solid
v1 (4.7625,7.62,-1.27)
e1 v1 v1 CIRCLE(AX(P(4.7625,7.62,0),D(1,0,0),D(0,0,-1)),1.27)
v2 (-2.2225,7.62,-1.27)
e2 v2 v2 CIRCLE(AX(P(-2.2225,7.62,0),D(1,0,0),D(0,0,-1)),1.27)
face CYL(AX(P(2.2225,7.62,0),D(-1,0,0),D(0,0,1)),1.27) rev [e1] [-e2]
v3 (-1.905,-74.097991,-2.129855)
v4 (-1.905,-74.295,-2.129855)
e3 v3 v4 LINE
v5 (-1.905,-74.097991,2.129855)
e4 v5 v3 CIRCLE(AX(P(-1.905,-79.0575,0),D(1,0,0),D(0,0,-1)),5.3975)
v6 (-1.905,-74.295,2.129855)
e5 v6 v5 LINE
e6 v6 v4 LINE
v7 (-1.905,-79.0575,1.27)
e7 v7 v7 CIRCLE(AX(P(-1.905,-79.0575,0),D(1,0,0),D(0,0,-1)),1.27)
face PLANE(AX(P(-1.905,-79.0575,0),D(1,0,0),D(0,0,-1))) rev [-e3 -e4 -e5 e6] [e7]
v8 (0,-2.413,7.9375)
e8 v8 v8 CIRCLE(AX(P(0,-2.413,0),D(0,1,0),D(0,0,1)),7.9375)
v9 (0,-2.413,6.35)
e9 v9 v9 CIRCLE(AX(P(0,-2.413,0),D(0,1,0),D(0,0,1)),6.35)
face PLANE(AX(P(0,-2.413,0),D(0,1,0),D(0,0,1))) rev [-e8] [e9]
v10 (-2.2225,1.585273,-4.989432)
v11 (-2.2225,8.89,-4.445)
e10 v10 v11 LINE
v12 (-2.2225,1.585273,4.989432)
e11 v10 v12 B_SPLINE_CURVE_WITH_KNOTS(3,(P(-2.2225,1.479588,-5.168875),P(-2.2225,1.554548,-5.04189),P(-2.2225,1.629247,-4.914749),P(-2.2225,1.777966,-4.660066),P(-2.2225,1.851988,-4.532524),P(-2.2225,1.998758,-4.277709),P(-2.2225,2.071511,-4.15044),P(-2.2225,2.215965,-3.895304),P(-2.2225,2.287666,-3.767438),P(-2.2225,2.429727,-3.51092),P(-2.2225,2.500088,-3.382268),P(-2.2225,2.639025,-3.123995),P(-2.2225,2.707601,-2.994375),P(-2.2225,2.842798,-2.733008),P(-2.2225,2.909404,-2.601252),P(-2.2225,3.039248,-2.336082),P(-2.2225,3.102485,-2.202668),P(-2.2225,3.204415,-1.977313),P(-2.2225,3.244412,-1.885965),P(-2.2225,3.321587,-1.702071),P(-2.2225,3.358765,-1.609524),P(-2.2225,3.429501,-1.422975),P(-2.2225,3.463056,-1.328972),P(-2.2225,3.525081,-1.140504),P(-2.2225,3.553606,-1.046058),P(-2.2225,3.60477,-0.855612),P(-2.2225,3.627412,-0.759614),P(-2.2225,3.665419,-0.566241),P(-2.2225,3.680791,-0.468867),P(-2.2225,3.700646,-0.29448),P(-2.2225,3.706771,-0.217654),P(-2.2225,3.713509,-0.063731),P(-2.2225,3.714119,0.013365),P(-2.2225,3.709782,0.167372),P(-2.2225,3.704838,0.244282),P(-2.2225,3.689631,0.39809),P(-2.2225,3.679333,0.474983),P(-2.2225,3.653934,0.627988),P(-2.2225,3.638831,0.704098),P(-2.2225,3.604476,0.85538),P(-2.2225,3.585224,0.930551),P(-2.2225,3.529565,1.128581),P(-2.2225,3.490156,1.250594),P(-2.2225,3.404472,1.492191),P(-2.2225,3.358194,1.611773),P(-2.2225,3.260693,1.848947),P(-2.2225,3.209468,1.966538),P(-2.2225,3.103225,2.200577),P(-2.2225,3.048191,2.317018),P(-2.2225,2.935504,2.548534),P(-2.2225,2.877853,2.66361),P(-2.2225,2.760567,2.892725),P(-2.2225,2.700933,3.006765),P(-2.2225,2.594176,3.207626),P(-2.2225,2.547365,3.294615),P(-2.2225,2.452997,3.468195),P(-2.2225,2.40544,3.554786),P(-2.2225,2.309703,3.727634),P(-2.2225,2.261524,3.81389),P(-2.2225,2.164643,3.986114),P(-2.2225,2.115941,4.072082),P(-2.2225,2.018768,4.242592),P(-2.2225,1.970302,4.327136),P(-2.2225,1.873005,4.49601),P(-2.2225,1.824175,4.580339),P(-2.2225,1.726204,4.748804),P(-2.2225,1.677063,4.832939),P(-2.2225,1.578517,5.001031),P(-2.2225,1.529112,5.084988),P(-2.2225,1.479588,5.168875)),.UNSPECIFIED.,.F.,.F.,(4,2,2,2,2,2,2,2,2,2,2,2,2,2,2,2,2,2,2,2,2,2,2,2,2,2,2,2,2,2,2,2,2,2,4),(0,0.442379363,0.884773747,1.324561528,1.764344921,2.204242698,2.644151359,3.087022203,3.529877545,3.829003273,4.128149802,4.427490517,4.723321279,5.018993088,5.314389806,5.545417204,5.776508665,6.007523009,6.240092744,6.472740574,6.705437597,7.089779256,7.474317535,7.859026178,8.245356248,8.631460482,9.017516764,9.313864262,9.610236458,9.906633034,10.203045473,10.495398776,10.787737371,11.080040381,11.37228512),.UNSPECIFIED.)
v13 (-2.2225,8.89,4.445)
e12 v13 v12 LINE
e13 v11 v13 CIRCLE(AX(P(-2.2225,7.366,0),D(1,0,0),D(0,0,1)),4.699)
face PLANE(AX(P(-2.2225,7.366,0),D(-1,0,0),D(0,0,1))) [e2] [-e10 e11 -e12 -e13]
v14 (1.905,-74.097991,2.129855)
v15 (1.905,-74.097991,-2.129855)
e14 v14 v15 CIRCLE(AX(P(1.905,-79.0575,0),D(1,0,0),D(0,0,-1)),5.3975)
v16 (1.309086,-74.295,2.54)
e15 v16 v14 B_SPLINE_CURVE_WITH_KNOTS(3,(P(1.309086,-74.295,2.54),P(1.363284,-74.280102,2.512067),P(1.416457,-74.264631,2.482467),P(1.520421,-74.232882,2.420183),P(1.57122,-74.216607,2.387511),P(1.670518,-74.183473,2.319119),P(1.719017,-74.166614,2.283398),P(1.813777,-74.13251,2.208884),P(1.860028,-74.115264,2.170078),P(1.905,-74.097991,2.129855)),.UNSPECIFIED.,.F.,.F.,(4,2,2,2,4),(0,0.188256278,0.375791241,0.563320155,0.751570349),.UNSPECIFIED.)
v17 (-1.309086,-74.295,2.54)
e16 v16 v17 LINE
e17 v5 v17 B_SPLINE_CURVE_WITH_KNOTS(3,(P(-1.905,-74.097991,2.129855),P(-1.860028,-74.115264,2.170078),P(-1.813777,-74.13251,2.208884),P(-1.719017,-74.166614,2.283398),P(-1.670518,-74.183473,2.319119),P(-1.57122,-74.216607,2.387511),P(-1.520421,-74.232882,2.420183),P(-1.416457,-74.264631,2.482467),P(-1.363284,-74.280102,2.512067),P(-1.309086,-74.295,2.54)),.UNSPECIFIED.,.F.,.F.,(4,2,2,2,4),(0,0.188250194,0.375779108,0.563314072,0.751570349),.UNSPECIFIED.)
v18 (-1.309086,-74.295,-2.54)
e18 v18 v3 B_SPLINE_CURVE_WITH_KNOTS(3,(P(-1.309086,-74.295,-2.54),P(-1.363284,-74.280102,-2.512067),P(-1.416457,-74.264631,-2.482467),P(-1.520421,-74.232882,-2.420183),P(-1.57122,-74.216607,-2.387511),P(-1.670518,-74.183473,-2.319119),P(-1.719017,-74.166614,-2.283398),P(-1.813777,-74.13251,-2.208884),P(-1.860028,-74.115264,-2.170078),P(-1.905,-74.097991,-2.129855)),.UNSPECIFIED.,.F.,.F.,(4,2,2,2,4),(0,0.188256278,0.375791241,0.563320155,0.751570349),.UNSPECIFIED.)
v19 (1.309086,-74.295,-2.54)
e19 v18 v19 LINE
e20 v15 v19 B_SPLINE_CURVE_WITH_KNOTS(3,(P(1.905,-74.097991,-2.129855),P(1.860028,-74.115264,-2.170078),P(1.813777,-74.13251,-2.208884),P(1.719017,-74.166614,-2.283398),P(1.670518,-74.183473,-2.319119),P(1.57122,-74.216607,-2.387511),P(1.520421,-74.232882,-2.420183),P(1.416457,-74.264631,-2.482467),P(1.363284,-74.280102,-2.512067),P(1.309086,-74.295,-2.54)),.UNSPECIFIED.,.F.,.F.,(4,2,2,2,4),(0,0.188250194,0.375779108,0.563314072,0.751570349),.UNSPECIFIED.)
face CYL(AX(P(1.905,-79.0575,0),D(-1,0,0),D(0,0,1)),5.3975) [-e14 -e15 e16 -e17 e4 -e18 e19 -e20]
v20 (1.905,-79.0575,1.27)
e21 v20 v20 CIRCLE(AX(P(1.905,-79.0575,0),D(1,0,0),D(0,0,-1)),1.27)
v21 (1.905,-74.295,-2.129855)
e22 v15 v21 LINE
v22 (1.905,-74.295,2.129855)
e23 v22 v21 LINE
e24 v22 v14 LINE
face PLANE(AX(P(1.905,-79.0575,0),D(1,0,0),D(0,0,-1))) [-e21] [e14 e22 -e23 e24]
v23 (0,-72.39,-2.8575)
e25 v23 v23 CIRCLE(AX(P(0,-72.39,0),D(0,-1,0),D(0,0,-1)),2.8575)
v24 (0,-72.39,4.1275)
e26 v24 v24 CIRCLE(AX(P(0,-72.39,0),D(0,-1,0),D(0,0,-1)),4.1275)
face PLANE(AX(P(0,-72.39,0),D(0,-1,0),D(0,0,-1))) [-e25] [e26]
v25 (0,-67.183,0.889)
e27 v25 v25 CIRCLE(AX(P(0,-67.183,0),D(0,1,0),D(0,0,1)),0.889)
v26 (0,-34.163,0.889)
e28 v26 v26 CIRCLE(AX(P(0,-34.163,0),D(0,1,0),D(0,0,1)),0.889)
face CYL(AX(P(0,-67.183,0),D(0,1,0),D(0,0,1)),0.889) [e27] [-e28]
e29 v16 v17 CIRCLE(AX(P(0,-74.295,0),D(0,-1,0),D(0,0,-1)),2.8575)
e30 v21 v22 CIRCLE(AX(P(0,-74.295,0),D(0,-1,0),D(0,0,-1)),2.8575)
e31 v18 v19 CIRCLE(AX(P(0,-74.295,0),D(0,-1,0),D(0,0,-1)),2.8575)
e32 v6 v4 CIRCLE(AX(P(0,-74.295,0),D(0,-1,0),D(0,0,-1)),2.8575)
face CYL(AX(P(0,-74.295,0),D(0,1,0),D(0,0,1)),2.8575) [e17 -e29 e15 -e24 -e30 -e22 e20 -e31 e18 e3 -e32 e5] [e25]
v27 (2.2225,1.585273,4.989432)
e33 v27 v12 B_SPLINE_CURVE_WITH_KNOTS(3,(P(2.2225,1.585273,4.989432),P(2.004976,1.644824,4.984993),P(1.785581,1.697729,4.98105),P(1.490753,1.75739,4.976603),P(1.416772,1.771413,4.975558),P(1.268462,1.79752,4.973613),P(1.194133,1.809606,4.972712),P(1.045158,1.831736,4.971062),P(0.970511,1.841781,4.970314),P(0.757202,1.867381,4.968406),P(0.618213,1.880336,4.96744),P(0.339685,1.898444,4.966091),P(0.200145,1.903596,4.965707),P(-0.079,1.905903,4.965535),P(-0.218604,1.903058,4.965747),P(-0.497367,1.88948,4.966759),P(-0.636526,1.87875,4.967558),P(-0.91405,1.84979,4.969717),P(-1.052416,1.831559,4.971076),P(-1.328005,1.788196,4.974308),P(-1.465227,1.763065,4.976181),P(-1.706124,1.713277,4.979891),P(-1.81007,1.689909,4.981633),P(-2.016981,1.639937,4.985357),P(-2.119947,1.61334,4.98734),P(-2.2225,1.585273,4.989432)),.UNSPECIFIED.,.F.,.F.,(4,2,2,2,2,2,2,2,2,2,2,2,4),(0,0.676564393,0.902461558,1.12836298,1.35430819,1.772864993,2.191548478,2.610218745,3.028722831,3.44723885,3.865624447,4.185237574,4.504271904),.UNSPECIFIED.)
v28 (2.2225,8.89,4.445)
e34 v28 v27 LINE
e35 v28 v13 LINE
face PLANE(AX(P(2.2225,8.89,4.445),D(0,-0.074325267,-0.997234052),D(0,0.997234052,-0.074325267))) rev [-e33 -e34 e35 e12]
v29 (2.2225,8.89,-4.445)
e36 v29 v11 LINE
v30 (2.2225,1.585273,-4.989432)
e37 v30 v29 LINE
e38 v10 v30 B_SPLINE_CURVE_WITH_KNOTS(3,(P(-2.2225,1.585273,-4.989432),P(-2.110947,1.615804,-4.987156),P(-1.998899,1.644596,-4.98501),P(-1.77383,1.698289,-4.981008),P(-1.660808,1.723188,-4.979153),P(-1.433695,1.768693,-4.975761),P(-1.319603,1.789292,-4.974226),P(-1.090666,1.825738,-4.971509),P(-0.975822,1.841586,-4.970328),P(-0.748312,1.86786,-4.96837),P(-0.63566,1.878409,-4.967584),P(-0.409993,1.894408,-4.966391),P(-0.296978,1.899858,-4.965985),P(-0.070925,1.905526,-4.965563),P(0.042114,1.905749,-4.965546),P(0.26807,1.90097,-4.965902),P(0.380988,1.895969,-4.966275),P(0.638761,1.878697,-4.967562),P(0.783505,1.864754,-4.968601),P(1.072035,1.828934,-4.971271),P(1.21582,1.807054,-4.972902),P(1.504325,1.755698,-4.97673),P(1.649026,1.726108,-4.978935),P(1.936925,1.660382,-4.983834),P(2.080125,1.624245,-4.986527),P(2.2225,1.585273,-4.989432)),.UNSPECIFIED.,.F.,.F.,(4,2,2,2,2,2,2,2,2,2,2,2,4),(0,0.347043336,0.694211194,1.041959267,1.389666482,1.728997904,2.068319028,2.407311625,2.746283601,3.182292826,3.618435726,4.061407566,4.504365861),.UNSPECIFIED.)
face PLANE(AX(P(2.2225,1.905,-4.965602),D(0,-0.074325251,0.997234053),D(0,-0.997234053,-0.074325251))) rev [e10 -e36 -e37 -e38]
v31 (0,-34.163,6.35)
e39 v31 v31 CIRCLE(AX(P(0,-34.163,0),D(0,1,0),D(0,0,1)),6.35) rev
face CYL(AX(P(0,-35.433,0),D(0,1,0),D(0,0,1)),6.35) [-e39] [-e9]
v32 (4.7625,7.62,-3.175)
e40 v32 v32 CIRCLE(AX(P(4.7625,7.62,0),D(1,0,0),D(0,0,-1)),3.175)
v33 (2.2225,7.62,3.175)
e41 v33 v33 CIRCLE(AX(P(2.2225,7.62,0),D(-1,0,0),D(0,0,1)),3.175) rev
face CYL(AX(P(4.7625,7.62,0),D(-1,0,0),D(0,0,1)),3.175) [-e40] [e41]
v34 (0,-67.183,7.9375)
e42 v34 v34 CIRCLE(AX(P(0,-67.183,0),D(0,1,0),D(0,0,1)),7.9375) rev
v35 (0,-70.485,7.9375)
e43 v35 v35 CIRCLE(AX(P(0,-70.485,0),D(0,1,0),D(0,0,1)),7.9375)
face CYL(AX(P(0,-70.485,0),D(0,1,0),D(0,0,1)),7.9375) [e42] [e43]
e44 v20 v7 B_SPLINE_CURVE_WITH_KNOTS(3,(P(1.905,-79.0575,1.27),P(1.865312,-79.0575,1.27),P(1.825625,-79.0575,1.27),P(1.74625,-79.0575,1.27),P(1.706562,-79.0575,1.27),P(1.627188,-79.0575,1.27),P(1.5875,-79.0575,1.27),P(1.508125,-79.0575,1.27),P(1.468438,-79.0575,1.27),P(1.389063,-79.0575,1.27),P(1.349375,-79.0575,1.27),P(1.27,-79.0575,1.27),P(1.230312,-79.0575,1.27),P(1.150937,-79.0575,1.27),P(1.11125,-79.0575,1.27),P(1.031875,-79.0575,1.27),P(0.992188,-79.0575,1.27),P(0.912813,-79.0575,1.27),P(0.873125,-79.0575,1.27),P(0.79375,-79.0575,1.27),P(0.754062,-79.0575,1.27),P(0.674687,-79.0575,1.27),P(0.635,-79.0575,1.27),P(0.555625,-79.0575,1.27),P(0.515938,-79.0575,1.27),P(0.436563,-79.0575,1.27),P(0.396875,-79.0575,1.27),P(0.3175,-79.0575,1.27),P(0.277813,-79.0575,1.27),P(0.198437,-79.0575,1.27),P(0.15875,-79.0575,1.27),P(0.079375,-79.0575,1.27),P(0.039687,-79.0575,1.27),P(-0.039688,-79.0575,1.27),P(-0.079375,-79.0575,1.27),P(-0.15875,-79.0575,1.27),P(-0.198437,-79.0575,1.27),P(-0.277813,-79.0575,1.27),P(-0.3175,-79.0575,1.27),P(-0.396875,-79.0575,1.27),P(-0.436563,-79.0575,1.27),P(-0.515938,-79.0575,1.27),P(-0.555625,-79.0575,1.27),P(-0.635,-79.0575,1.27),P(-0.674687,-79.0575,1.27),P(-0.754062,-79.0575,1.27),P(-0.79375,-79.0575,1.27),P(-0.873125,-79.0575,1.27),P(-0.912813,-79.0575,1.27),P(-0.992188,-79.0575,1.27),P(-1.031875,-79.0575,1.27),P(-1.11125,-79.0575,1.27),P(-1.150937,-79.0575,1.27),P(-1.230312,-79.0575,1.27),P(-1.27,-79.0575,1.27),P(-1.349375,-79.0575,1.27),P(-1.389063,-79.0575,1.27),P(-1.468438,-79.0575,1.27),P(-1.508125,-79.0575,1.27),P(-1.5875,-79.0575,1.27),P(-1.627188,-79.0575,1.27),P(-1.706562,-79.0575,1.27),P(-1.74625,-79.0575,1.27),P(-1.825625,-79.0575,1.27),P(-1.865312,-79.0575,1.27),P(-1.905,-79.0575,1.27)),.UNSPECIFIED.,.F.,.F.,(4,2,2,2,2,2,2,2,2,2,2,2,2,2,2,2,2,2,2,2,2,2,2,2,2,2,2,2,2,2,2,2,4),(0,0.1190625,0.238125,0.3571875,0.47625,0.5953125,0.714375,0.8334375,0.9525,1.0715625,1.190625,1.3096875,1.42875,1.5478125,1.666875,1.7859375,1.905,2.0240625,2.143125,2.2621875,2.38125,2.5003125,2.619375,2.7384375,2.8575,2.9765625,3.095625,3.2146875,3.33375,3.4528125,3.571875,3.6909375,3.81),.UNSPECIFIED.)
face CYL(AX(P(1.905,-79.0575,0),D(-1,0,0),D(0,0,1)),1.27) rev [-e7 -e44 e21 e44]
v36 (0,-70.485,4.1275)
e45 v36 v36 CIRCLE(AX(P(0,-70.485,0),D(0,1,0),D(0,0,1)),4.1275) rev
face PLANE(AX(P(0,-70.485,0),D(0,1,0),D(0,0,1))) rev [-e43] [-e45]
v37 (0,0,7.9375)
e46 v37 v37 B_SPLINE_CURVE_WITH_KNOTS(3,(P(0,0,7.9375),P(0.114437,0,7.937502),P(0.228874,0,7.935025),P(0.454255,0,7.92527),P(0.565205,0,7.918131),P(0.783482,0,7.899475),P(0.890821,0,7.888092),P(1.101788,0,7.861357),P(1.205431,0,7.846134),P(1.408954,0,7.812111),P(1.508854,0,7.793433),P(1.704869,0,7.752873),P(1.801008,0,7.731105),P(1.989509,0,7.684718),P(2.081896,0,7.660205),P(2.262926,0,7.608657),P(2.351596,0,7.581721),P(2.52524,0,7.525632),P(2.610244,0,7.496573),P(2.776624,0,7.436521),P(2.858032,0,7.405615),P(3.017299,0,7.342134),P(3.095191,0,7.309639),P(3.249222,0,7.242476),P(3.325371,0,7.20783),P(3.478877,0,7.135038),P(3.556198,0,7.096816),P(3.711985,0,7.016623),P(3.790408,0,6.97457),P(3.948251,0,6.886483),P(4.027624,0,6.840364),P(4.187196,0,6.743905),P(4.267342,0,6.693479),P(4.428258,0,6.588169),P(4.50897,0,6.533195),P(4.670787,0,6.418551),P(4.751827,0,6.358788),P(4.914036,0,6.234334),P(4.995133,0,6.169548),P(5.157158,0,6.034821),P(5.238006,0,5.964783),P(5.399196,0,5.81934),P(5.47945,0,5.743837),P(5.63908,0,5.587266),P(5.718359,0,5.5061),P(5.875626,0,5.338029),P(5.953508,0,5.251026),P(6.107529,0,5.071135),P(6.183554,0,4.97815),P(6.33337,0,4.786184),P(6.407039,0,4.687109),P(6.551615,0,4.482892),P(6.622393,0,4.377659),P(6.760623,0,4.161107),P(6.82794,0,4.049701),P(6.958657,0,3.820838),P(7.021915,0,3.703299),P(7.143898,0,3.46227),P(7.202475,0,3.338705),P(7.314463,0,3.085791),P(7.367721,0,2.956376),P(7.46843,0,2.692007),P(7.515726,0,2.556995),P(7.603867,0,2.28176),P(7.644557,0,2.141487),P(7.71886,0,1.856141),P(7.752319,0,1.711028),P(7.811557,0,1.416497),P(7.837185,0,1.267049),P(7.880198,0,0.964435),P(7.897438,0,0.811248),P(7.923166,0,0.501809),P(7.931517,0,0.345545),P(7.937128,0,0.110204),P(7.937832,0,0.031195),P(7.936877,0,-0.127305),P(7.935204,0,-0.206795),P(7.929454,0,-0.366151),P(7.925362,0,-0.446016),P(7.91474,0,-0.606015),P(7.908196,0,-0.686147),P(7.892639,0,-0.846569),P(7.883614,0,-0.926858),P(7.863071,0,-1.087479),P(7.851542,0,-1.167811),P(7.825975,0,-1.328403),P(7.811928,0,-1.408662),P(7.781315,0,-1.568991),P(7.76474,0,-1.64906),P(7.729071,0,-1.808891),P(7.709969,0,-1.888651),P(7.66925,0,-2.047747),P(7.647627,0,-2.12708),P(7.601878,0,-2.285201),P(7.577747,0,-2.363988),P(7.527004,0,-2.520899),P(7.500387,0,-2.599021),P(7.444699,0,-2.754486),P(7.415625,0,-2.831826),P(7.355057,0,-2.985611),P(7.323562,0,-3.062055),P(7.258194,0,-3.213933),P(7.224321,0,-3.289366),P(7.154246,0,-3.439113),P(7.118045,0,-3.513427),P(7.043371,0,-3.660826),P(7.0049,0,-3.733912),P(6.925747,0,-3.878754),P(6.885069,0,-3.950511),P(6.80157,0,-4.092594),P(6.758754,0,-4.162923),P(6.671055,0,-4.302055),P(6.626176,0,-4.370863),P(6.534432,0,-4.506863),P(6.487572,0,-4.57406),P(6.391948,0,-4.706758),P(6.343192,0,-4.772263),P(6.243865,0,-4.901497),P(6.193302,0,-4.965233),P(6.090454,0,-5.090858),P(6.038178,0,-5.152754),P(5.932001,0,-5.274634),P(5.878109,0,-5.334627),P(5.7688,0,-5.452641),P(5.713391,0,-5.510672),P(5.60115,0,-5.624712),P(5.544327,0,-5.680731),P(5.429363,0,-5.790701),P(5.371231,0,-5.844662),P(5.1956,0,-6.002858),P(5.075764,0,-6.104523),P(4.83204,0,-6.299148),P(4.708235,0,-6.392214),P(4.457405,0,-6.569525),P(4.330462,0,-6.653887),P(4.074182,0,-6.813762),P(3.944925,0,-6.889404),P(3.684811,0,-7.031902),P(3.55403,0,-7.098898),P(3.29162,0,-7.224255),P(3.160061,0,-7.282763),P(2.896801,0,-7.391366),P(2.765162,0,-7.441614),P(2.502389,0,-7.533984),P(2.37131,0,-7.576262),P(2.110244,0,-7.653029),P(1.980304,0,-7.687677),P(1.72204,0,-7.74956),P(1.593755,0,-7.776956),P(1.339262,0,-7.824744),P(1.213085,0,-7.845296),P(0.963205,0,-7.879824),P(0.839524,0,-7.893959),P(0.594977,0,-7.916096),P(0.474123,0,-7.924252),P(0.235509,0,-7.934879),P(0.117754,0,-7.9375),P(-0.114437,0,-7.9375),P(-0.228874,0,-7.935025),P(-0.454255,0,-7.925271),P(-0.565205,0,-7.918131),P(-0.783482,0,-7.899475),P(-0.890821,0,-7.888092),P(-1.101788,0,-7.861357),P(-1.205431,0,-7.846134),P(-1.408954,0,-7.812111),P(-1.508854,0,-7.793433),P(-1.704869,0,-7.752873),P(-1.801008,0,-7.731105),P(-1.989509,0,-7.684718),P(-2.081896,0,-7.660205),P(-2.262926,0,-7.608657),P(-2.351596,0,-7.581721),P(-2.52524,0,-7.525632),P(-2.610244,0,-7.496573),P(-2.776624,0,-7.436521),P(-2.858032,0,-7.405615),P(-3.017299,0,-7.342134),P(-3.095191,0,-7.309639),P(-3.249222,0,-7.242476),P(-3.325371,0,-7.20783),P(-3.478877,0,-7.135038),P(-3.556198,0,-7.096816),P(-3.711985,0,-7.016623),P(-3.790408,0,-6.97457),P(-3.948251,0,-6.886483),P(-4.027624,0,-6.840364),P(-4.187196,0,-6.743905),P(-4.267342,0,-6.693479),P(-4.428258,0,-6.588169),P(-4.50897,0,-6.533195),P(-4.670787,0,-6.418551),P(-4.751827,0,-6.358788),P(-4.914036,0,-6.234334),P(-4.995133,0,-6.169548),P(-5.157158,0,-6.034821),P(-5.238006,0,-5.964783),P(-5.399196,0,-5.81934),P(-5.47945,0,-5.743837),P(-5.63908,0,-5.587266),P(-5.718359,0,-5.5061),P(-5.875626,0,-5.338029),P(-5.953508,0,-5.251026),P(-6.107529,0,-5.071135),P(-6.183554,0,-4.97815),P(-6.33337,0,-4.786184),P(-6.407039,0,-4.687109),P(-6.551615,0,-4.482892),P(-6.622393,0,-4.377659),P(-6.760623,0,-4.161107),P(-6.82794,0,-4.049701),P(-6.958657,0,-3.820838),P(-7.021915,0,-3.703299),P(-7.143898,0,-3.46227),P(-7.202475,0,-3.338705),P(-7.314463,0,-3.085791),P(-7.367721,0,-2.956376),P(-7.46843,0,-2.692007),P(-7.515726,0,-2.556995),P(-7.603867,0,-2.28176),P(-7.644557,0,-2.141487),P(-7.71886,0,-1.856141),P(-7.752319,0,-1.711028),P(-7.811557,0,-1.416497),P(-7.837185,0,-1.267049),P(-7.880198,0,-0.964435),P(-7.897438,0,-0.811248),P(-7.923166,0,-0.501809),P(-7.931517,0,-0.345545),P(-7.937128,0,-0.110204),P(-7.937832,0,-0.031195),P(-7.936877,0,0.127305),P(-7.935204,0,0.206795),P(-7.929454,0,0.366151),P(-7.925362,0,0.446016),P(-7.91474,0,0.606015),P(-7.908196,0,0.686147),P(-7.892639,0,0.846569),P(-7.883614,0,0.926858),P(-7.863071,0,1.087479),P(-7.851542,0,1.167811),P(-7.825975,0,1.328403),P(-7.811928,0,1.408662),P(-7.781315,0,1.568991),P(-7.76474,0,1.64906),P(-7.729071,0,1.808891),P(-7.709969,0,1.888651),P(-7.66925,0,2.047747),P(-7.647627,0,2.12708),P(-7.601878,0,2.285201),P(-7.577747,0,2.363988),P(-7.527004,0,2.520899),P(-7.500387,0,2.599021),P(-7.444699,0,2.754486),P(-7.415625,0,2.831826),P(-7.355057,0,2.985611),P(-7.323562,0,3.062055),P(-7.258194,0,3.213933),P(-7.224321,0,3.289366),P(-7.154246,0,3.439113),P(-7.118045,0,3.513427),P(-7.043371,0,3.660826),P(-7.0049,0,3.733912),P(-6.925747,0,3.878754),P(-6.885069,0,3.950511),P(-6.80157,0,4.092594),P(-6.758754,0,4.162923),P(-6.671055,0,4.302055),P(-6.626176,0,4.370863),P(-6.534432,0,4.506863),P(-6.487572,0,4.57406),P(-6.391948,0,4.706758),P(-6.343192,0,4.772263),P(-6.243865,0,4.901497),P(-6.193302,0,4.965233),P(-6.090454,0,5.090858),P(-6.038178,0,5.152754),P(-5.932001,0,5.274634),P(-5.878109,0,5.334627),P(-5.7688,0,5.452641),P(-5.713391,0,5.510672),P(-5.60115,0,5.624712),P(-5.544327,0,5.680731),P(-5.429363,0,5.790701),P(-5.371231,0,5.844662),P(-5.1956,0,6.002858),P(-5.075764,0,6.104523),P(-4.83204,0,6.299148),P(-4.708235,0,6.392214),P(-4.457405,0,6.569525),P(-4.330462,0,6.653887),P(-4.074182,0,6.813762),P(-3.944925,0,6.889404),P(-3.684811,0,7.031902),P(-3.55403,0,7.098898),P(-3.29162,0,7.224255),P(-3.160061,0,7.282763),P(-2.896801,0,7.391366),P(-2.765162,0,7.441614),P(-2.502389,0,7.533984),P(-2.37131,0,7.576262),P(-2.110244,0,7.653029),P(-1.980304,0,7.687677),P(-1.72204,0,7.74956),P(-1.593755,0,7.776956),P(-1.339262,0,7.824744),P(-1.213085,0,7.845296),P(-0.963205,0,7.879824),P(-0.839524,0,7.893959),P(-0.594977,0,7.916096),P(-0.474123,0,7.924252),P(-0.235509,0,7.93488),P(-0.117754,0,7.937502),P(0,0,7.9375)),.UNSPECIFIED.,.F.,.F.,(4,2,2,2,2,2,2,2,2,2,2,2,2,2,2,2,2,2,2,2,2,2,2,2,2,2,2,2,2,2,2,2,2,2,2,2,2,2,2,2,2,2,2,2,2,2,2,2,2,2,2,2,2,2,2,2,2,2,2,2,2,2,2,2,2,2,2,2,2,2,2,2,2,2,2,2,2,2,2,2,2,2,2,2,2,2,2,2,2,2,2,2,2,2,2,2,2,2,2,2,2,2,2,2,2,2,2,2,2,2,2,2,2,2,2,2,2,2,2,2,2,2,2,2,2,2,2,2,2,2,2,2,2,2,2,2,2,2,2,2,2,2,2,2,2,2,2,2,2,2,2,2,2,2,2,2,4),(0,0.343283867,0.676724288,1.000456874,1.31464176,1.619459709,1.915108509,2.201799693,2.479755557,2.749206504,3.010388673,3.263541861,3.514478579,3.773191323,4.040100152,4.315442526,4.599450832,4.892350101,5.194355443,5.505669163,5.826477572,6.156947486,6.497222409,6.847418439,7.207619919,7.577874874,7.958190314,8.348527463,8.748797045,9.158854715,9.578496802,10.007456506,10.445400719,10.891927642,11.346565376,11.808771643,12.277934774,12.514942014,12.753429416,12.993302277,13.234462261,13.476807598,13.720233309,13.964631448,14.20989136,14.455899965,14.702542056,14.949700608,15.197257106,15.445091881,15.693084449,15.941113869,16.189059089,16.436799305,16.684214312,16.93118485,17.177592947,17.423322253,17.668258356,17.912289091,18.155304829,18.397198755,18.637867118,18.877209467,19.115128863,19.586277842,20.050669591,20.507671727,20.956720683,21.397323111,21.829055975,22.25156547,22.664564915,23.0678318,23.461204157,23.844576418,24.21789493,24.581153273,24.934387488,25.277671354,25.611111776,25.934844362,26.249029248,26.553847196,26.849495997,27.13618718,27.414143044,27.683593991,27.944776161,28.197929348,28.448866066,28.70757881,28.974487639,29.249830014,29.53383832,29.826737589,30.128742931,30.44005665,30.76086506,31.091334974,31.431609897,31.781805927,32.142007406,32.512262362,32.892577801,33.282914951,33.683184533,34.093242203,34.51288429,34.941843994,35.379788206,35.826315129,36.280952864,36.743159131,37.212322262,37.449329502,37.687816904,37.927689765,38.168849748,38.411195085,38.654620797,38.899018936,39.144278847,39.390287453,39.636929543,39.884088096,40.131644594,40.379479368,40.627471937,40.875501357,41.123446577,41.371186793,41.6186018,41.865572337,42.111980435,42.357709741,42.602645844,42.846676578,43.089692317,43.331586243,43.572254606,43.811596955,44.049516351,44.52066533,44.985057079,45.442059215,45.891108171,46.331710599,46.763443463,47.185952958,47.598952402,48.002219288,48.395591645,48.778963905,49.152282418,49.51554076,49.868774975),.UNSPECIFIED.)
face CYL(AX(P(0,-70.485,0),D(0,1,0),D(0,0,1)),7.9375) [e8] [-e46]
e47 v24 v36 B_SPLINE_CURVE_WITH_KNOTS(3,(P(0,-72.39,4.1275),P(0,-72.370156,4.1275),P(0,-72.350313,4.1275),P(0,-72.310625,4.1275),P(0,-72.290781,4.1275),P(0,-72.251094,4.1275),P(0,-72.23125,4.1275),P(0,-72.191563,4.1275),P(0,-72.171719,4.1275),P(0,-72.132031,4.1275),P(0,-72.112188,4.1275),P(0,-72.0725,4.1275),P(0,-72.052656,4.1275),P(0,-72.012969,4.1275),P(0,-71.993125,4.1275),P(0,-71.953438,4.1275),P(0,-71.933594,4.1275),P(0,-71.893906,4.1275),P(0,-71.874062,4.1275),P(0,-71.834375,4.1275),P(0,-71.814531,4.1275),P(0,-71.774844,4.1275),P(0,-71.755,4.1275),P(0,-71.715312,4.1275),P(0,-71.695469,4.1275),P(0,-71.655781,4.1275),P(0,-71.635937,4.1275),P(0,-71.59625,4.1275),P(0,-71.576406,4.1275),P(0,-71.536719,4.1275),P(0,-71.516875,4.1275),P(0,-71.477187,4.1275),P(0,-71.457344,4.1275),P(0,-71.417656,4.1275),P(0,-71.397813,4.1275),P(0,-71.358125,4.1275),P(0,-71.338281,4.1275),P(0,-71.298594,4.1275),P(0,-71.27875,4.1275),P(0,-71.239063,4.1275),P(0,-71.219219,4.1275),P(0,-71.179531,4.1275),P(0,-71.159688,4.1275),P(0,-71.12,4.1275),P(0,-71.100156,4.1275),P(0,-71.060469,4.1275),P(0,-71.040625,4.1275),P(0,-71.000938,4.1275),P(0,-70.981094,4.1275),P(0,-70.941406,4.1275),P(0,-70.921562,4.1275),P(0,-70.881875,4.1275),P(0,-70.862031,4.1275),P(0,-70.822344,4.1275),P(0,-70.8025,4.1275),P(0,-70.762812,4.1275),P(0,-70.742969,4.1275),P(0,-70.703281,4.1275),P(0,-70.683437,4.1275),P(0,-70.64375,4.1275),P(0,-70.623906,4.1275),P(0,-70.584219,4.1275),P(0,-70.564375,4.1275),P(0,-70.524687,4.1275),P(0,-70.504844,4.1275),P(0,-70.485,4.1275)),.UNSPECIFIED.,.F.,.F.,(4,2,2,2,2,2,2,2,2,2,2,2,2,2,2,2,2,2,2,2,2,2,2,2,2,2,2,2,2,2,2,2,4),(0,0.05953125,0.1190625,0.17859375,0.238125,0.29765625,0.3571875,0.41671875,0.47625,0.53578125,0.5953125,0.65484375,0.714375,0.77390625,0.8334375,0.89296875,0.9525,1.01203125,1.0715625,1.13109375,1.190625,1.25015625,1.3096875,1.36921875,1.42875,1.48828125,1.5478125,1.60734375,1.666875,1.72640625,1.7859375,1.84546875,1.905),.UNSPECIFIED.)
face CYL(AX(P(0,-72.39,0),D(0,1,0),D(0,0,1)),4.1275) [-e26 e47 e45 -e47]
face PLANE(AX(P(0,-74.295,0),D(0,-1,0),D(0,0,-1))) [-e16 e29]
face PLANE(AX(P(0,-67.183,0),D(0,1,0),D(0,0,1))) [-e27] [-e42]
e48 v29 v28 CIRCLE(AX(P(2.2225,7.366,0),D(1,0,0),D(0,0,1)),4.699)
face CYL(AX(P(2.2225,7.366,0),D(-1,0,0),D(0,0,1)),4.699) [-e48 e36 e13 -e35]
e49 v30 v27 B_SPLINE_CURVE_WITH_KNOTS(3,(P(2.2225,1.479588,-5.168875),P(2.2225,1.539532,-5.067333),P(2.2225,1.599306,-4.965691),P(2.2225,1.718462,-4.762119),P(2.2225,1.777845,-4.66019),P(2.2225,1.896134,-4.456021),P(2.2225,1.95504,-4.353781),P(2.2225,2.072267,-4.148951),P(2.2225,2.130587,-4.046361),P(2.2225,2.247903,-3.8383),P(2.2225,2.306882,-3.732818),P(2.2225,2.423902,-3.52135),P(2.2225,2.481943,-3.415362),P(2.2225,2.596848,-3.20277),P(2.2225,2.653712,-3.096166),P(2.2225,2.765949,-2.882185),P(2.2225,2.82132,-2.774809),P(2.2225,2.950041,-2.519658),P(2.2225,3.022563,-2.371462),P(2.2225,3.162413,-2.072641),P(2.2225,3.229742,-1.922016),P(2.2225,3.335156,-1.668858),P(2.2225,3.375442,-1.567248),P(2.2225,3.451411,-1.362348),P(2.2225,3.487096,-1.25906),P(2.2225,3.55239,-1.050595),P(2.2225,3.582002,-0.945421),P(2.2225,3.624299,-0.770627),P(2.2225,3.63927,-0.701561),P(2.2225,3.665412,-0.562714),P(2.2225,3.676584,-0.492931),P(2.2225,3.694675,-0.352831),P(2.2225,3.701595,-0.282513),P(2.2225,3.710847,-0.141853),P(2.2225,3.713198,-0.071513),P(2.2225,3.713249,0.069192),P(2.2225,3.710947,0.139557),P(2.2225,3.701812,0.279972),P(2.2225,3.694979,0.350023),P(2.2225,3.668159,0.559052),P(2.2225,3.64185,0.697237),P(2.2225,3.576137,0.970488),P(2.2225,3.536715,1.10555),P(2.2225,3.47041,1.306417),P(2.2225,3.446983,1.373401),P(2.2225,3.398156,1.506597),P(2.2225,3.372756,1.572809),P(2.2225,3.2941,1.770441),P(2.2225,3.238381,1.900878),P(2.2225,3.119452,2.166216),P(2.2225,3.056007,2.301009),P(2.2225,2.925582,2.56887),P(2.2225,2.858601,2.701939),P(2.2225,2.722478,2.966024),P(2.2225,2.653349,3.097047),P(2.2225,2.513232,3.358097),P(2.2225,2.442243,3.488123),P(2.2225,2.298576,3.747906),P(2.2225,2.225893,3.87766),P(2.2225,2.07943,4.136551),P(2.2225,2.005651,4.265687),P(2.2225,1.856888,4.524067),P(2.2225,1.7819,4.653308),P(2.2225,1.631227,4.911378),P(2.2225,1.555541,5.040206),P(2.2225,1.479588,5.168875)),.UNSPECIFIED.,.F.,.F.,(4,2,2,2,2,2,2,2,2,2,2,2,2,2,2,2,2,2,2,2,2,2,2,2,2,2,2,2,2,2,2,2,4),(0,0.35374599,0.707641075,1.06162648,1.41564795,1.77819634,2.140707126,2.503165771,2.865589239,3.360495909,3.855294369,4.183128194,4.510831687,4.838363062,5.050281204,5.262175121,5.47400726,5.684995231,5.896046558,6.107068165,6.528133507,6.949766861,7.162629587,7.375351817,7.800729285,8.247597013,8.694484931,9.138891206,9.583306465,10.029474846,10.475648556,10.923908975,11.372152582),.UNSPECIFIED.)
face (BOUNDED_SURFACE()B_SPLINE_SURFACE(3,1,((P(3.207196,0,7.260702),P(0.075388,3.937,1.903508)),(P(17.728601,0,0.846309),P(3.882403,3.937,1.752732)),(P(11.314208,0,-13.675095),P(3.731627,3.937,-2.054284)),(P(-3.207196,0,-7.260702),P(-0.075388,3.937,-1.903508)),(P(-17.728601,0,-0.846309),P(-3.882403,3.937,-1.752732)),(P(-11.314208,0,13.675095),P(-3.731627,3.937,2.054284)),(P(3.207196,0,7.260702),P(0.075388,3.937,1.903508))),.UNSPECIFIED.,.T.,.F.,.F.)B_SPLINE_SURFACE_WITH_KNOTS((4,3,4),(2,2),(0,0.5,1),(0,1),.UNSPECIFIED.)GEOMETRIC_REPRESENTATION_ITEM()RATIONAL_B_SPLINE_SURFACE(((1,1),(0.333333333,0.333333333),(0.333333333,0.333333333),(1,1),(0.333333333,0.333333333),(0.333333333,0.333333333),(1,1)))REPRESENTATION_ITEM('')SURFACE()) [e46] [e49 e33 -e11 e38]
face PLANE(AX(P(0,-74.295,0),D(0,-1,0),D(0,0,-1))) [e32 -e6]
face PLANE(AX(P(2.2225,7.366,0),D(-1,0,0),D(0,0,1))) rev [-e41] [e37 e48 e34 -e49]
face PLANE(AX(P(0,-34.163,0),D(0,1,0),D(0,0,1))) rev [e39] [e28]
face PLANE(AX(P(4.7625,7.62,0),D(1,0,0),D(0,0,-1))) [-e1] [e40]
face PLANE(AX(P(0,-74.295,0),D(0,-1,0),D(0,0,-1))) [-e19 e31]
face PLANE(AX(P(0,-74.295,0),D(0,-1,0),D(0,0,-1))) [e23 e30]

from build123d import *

# Parameters (mm, degrees)
SKETCH1_R      = 7.9375
EXTRUDE1_DEPTH = 70.485
SKETCH4_R      = 1.27
EXTRUDE2_DEPTH = 2.2225
SKETCH5_R      = 5.3975
SKETCH5_R_2    = 1.27
EXTRUDE3_DEPTH = 1.905
SKETCH6_R      = 4.1275
EXTRUDE4_DEPTH = 1.905
SKETCH7_R      = 2.8575
EXTRUDE5_DEPTH = 1.905
SKETCH8_R      = 3.175
SKETCH8_R_2    = 1.27
EXTRUDE6_DEPTH = 2.54
SKETCH9_R      = 7.9375
SKETCH9_R_2    = 6.35
EXTRUDE7_DEPTH = 33.02
SKETCH10_R     = 8.451029387
SKETCH10_R_2   = 0.889
EXTRUDE8_DEPTH = 33.02


with BuildPart() as part:
    # Sketch1 → Extrude1 (new body)
    with BuildSketch(Plane(origin=(0, 0, 0), x_dir=(1, 0, 0), z_dir=(0, 1, 0))):
        with Locations(Location((0, 0, 0), (0, 0, 270))):
            Circle(SKETCH1_R)
    extrude(amount=-EXTRUDE1_DEPTH)

    # Loft1: read off the stored shape, not the designer's step
    # Loft1: loft between two sections, ruled curve by curve
    loft1_from = [
        Edge.make_bspline([(3.207196431, 0, 7.26070226), (17.72860095, 0, 0.846309398), (11.314208088, 0, -13.675095122), (-3.207196431, 0, -7.26070226), (-17.72860095, 0, -0.846309398), (-11.314208088, 0, 13.675095122), (3.207196431, 0, 7.26070226)], [0, 0, 0, 0, 0.5, 0.5, 0.5, 1, 1, 1, 1], 3, [1, 0.333333333, 0.333333333, 1, 0.333333333, 0.333333333, 1]),
    ]
    loft1_to = [
        Edge.make_bspline([(0.075387957, 3.937, 1.903507724), (3.882403406, 3.937, 1.75273181), (3.731627491, 3.937, -2.054283639), (-0.075387957, 3.937, -1.903507724), (-3.882403406, 3.937, -1.75273181), (-3.731627491, 3.937, 2.054283639), (0.075387957, 3.937, 1.903507724)], [0, 0, 0, 0, 0.5, 0.5, 0.5, 1, 1, 1, 1], 3, [1, 0.333333333, 0.333333333, 1, 0.333333333, 0.333333333, 1]),
    ]
    loft1 = Solid(Shell([*[Face.make_surface_from_curves(loft1_from[k], loft1_to[k]) for k in range(1)], Face(Wire(loft1_from)), Face(Wire(loft1_to))]))
    add(loft1)

    # Sketch4 → Extrude2 (add, symmetric)
    with BuildSketch(Plane(origin=(0, 0, 0), x_dir=(0, 0, -1), z_dir=(1, 0, 0))):
        with BuildLine():
            Line((4.965601833, 1.905), (4.445, 8.89))
            ThreePointArc((4.445, 8.89), (0, 12.065), (-4.445, 8.89))
            Line((-4.445, 8.89), (-4.965601949, 1.905))
            Line((-4.965601949, 1.905), (-5.107584298, 0))
            Line((-5.107584298, 0), (5.107584151, 0))
            Line((5.107584151, 0), (4.965601833, 1.905))
        make_face()
        with Locations((0, 7.62)):
            Circle(SKETCH4_R, mode=Mode.SUBTRACT)
    extrude(amount=EXTRUDE2_DEPTH, both=True)

    # Sketch6 → Extrude4 (add)
    with BuildSketch(Plane.XZ.offset(70.485)):
        with Locations(Location((0, 0, 0), (0, 0, 90))):
            Circle(SKETCH6_R)
    extrude(amount=EXTRUDE4_DEPTH)



with BuildPart() as body_2:
    # Sketch5 → Extrude3 (new, symmetric)
    with BuildSketch(Plane(origin=(0, 0, 0), x_dir=(0, 0, -1), z_dir=(1, 0, 0))):
        with Locations(Location((0, -79.0575, 0), (0, 0, 180))):
            Circle(SKETCH5_R)
        with Locations(Location((0, -79.0575, 0), (0, 0, 180))):
            Circle(SKETCH5_R_2, mode=Mode.SUBTRACT)
    extrude(amount=EXTRUDE3_DEPTH, both=True)


with BuildPart() as part_1:
    add(part.part)

    add(body_2.part)  # Extrude5 merges body 2
    # Sketch7 → Extrude5 (add)
    with BuildSketch(Plane.XZ.offset(72.39)):
        with Locations(Location((0, 0, 0), (0, 0, 117.266044451))):
            Circle(SKETCH7_R)
    extrude(amount=EXTRUDE5_DEPTH)

    # Sketch8 → Extrude6 (add)
    with BuildSketch(Plane(origin=(2.2225, 0, 0), x_dir=(0, 0, -1), z_dir=(1, 0, 0))):
        with Locations(Location((0, 7.62, 0), (0, 0, 180))):
            Circle(SKETCH8_R)
        with Locations((0, 7.62)):
            Circle(SKETCH8_R_2, mode=Mode.SUBTRACT)
    extrude(amount=EXTRUDE6_DEPTH)

    # Sketch9 → Extrude7 (cut)
    with BuildSketch(Plane(origin=(0, -2.413, 0), x_dir=(-1, 0, 0), z_dir=(0, 1, 0))):
        with Locations(Location((0, 0, 0), (0, 0, 90))):
            Circle(SKETCH9_R)
        with Locations(Location((0, 0, 0), (0, 0, 90))):
            Circle(SKETCH9_R_2, mode=Mode.SUBTRACT)
    extrude(amount=-EXTRUDE7_DEPTH, mode=Mode.SUBTRACT)

    # Sketch10 → Extrude8 (cut)
    with BuildSketch(Plane(origin=(0, -34.163, 0), x_dir=(-1, 0, 0), z_dir=(0, 1, 0))):
        Circle(SKETCH10_R)
        with Locations(Location((0, 0, 0), (0, 0, 90))):
            Circle(SKETCH10_R_2, mode=Mode.SUBTRACT)
    extrude(amount=-EXTRUDE8_DEPTH, mode=Mode.SUBTRACT)


solid = part_1.part
